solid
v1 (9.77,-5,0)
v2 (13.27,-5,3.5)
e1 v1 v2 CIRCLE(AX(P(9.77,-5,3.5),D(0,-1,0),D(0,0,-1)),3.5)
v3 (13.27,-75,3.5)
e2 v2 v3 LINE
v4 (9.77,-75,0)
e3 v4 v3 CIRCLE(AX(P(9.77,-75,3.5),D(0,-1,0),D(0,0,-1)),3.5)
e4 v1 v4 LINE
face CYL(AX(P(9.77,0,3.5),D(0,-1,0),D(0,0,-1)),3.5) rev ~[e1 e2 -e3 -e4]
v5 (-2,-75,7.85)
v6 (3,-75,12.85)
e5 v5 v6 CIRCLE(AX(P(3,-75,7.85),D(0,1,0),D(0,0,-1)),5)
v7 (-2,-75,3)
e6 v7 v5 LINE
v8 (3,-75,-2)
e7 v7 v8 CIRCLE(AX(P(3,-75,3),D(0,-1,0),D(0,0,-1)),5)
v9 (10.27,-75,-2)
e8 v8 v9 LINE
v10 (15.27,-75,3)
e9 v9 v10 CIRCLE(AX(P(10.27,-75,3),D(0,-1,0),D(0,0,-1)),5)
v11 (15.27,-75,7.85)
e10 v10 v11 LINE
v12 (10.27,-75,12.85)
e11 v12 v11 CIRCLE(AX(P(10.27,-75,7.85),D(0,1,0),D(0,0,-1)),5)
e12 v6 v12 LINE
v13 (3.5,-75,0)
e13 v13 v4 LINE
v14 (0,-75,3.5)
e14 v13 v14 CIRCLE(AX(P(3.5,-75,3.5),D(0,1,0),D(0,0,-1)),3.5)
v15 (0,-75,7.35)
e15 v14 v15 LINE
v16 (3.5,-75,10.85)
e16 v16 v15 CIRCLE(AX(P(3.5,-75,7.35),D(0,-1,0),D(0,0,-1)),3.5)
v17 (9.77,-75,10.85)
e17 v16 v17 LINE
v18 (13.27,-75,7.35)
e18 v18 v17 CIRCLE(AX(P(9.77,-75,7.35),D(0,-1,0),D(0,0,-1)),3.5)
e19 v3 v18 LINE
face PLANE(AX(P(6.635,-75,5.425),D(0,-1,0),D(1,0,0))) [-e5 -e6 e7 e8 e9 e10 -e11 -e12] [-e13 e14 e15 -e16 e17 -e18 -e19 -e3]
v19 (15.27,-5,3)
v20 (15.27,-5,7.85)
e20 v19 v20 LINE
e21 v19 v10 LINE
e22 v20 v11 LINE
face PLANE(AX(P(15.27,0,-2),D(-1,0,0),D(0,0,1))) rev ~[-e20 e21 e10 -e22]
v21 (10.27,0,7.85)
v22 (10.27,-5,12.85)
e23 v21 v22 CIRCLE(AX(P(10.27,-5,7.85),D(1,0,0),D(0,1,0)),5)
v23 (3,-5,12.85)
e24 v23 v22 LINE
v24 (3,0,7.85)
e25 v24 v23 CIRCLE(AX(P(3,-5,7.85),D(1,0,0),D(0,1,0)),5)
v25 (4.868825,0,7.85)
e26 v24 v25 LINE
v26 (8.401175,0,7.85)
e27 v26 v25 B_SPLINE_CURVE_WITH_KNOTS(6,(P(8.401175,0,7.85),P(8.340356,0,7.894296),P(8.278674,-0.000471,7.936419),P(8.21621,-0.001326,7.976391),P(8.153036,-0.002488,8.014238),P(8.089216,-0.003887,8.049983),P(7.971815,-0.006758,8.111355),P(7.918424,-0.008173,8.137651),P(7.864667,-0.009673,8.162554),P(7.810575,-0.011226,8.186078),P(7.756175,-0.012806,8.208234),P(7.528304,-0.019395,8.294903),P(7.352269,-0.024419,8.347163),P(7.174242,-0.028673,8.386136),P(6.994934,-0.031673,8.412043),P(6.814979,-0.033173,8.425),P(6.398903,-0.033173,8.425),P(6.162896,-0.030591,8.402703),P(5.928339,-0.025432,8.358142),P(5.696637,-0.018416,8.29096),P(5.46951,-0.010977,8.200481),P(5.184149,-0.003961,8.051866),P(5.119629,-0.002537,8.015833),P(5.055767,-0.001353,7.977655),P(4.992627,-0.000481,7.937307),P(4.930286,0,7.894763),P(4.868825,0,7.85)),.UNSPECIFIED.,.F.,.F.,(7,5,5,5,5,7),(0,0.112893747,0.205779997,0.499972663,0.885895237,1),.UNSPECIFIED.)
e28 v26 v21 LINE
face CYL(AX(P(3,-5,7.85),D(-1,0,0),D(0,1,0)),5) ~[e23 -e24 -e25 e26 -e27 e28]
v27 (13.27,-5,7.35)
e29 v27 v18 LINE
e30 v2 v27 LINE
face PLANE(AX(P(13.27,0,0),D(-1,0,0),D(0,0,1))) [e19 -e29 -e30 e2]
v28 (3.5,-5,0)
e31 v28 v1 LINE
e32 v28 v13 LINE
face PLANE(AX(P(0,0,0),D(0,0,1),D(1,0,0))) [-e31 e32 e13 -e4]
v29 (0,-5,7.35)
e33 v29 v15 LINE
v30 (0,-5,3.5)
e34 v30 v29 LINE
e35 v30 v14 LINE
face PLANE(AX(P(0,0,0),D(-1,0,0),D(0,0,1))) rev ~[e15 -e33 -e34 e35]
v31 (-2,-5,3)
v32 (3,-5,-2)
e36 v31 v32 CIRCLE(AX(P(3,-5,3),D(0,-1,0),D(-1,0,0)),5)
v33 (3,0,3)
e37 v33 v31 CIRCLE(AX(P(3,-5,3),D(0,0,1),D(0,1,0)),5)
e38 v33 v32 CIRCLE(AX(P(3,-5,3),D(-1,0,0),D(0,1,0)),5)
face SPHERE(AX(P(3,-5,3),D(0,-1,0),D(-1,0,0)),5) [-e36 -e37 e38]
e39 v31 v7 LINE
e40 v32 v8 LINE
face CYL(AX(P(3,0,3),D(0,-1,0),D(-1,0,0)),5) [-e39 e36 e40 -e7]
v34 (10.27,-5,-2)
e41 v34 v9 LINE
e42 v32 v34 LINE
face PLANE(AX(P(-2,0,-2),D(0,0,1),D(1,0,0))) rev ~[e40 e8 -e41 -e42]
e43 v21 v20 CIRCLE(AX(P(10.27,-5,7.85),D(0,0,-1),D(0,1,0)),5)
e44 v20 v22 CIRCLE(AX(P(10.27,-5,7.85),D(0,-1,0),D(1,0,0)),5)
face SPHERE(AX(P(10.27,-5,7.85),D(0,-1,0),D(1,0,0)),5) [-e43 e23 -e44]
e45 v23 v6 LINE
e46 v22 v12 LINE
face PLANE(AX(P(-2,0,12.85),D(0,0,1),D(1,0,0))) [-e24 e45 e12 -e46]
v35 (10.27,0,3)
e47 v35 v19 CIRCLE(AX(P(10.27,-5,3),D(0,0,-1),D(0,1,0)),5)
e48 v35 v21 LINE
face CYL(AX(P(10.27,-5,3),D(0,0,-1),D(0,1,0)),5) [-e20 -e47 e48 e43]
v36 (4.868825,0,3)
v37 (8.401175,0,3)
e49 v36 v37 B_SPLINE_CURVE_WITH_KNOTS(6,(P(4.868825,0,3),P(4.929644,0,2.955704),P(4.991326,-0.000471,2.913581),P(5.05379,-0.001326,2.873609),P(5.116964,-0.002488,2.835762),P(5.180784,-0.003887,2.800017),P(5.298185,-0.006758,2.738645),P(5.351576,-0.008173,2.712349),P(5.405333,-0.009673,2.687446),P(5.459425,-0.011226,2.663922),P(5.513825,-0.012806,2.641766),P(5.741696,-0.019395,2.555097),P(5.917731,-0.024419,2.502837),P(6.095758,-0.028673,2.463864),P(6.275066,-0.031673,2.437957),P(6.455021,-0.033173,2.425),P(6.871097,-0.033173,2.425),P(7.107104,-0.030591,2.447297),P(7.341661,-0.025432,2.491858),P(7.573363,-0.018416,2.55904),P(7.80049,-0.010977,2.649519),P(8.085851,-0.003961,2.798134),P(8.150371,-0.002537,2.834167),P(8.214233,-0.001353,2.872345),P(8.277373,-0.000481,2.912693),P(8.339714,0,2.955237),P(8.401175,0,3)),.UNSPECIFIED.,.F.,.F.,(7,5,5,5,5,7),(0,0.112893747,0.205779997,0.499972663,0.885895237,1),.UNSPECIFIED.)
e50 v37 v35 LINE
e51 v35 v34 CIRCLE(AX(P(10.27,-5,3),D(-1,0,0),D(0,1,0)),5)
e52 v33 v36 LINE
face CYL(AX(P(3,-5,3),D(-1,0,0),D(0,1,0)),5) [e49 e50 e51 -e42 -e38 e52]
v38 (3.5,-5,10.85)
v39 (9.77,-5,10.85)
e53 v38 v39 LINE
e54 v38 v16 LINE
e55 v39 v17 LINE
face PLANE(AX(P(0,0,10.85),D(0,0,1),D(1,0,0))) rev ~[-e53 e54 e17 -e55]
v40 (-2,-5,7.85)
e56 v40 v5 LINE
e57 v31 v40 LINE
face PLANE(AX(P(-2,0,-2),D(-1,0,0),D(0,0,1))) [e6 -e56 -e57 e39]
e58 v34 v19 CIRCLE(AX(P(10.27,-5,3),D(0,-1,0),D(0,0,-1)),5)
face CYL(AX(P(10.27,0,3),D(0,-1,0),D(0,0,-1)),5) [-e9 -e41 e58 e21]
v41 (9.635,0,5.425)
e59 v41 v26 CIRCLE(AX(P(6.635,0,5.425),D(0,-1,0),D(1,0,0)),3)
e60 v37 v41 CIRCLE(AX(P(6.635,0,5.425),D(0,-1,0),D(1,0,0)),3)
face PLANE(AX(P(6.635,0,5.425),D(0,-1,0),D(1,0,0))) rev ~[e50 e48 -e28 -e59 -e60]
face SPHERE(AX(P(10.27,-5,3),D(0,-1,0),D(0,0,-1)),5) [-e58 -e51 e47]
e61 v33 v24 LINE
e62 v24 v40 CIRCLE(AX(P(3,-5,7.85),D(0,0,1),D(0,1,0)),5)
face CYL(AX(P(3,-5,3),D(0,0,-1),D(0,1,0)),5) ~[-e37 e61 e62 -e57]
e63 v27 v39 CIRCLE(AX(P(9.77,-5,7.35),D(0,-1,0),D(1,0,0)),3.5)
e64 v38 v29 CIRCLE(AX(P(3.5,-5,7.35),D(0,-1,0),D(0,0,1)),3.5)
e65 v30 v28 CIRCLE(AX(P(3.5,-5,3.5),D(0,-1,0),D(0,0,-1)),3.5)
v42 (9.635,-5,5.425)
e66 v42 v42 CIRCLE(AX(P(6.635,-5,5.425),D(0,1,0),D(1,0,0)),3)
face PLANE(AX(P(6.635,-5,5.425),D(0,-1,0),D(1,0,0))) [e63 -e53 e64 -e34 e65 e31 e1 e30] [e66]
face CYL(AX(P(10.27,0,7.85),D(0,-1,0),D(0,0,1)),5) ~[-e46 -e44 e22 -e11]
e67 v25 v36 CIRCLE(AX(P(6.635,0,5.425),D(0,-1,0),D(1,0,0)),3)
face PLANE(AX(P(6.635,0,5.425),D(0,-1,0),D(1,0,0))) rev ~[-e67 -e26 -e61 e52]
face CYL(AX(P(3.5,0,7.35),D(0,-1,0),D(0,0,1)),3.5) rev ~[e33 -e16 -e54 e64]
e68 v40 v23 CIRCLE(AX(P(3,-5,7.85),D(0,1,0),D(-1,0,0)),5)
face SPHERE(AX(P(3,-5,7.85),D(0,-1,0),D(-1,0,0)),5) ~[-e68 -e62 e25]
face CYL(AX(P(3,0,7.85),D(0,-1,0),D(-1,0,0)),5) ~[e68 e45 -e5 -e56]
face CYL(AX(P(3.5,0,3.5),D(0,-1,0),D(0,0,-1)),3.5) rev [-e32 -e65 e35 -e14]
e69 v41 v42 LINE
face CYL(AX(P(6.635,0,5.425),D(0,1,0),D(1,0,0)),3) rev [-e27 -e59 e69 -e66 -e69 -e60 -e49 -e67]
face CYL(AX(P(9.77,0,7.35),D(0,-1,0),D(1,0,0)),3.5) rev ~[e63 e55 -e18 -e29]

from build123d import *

# Parameters (mm, degrees)
F0_W         = 17.27
F0_H         = 14.85
F0_W_2       = 13.27
F0_H_2       = 10.85
F1_DEPTH     = 75
F2_R         = 3.5
F3_R         = 5
F4_W         = 13.27
F4_H         = 10.85
F5_DEPTH     = 5
F6_R         = 3
F7_DEPTH     = 25
F8_T1_DEPTH  = 7.27
F8_T3_DEPTH  = 4.85
F8_T6_ANGLE  = 90
F8_T8_ANGLE  = 90
F8_T10_ANGLE = 90
F8_T12_ANGLE = 90


# Not quite as in the source:
# - a fillet or chamfer that OpenCascade refuses, or shapes differently, is made with other operations: its cross-section is extruded or revolved along the edge and cut away or added


with BuildPart() as f1:
    # F0 (on Front) → F1 (new body)
    with BuildSketch(Plane.XZ):
        with Locations((6.635, 5.425)):
            Rectangle(F0_W, F0_H)
        with Locations((6.635, 5.425)):
            Rectangle(F0_W_2, F0_H_2, mode=Mode.SUBTRACT)
    extrude(amount=F1_DEPTH)

    # F2
    f2_edges = [f1.edges().sort_by_distance(p)[0] for p in [
        (0, -37.5, 10.85),
        (13.27, -37.5, 0),
        (13.27, -37.5, 10.85),
        (0, -37.5, 0),
    ]]
    fillet(f2_edges, radius=F2_R)

    # F3
    f3_edges = [f1.edges().sort_by_distance(p)[0] for p in [
        (-2, -37.5, 12.85),
        (15.27, -37.5, 12.85),
        (15.27, -37.5, -2),
        (-2, -37.5, -2),
    ]]
    fillet(f3_edges, radius=F3_R)

    # F4 (on face) → F5 (join)
    with BuildSketch(Plane.XZ):
        with Locations((6.635, 5.425)):
            Rectangle(F4_W, F4_H)
    extrude(amount=F5_DEPTH)

    # F6 (on face) → F7 (cut)
    with BuildSketch(Plane.XZ):
        with Locations((6.635, 5.425)):
            Circle(F6_R)
    extrude(amount=F7_DEPTH, mode=Mode.SUBTRACT)

    # F8: fillet of radius 5 on 8 edges, made by hand

    # F8_s2 → F8_t1 (cut)
    with BuildSketch(Plane.YZ.offset(3)):
        with BuildLine():
            ThreePointArc((0, 7.85), (-1.4644660941, 11.3855339059), (-5, 12.85))
            Line((-5, 12.85), (0, 12.85))
            Line((0, 12.85), (0, 7.85))
        make_face()
        with BuildLine():
            ThreePointArc((0, 3), (-1.4644660941, -0.5355339059), (-5, -2))
            Line((-5, -2), (0, -2))
            Line((0, -2), (0, 3))
        make_face()
    extrude(amount=F8_T1_DEPTH, mode=Mode.SUBTRACT)

    # F8_s4 → F8_t3 (cut)
    with BuildSketch(Plane.XY.offset(3)):
        with BuildLine():
            ThreePointArc((3, 0), (-0.5355339059, -1.4644660941), (-2, -5))
            Line((-2, -5), (-2, 0))
            Line((-2, 0), (3, 0))
        make_face()
        with BuildLine():
            ThreePointArc((10.27, 0), (13.8055339059, -1.4644660941), (15.27, -5))
            Line((15.27, -5), (15.27, 0))
            Line((15.27, 0), (10.27, 0))
        make_face()
    extrude(amount=F8_T3_DEPTH, mode=Mode.SUBTRACT)

    # F8_s5 → F8_t6 (revolve, cut)
    with BuildSketch(Plane.XY.offset(7.85)):
        with BuildLine():
            ThreePointArc((3, 0), (-0.5355339059, -1.4644660941), (-2, -5))
            Line((-2, -5), (-2, 0))
            Line((-2, 0), (3, 0))
        make_face()
    revolve(axis=Axis((3, 0, 7.85), (0, 1, 0)), revolution_arc=F8_T6_ANGLE, mode=Mode.SUBTRACT)

    # F8_s7 → F8_t8 (revolve, cut)
    with BuildSketch(Plane.XY.offset(3)):
        with BuildLine():
            ThreePointArc((3, 0), (-0.5355339059, -1.4644660941), (-2, -5))
            Line((-2, -5), (-2, 0))
            Line((-2, 0), (3, 0))
        make_face()
    revolve(axis=Axis((3, 0, 3), (0, -1, 0)), revolution_arc=F8_T8_ANGLE, mode=Mode.SUBTRACT)

    # F8_s9 → F8_t10 (revolve, cut)
    with BuildSketch(Plane.XY.offset(7.85)):
        with BuildLine():
            ThreePointArc((10.27, 0), (13.8055339059, -1.4644660941), (15.27, -5))
            Line((15.27, -5), (15.27, 0))
            Line((15.27, 0), (10.27, 0))
        make_face()
    revolve(axis=Axis((10.27, 0, 7.85), (0, -1, 0)), revolution_arc=F8_T10_ANGLE, mode=Mode.SUBTRACT)

    # F8_s11 → F8_t12 (revolve, cut)
    with BuildSketch(Plane.YZ.offset(10.27)):
        with BuildLine():
            ThreePointArc((0, 3), (-1.4644660941, -0.5355339059), (-5, -2))
            Line((-5, -2), (0, -2))
            Line((0, -2), (0, 3))
        make_face()
    revolve(axis=Axis((10.27, 0, 3), (0, -1, 0)), revolution_arc=F8_T12_ANGLE, mode=Mode.SUBTRACT)


solid = f1.part
